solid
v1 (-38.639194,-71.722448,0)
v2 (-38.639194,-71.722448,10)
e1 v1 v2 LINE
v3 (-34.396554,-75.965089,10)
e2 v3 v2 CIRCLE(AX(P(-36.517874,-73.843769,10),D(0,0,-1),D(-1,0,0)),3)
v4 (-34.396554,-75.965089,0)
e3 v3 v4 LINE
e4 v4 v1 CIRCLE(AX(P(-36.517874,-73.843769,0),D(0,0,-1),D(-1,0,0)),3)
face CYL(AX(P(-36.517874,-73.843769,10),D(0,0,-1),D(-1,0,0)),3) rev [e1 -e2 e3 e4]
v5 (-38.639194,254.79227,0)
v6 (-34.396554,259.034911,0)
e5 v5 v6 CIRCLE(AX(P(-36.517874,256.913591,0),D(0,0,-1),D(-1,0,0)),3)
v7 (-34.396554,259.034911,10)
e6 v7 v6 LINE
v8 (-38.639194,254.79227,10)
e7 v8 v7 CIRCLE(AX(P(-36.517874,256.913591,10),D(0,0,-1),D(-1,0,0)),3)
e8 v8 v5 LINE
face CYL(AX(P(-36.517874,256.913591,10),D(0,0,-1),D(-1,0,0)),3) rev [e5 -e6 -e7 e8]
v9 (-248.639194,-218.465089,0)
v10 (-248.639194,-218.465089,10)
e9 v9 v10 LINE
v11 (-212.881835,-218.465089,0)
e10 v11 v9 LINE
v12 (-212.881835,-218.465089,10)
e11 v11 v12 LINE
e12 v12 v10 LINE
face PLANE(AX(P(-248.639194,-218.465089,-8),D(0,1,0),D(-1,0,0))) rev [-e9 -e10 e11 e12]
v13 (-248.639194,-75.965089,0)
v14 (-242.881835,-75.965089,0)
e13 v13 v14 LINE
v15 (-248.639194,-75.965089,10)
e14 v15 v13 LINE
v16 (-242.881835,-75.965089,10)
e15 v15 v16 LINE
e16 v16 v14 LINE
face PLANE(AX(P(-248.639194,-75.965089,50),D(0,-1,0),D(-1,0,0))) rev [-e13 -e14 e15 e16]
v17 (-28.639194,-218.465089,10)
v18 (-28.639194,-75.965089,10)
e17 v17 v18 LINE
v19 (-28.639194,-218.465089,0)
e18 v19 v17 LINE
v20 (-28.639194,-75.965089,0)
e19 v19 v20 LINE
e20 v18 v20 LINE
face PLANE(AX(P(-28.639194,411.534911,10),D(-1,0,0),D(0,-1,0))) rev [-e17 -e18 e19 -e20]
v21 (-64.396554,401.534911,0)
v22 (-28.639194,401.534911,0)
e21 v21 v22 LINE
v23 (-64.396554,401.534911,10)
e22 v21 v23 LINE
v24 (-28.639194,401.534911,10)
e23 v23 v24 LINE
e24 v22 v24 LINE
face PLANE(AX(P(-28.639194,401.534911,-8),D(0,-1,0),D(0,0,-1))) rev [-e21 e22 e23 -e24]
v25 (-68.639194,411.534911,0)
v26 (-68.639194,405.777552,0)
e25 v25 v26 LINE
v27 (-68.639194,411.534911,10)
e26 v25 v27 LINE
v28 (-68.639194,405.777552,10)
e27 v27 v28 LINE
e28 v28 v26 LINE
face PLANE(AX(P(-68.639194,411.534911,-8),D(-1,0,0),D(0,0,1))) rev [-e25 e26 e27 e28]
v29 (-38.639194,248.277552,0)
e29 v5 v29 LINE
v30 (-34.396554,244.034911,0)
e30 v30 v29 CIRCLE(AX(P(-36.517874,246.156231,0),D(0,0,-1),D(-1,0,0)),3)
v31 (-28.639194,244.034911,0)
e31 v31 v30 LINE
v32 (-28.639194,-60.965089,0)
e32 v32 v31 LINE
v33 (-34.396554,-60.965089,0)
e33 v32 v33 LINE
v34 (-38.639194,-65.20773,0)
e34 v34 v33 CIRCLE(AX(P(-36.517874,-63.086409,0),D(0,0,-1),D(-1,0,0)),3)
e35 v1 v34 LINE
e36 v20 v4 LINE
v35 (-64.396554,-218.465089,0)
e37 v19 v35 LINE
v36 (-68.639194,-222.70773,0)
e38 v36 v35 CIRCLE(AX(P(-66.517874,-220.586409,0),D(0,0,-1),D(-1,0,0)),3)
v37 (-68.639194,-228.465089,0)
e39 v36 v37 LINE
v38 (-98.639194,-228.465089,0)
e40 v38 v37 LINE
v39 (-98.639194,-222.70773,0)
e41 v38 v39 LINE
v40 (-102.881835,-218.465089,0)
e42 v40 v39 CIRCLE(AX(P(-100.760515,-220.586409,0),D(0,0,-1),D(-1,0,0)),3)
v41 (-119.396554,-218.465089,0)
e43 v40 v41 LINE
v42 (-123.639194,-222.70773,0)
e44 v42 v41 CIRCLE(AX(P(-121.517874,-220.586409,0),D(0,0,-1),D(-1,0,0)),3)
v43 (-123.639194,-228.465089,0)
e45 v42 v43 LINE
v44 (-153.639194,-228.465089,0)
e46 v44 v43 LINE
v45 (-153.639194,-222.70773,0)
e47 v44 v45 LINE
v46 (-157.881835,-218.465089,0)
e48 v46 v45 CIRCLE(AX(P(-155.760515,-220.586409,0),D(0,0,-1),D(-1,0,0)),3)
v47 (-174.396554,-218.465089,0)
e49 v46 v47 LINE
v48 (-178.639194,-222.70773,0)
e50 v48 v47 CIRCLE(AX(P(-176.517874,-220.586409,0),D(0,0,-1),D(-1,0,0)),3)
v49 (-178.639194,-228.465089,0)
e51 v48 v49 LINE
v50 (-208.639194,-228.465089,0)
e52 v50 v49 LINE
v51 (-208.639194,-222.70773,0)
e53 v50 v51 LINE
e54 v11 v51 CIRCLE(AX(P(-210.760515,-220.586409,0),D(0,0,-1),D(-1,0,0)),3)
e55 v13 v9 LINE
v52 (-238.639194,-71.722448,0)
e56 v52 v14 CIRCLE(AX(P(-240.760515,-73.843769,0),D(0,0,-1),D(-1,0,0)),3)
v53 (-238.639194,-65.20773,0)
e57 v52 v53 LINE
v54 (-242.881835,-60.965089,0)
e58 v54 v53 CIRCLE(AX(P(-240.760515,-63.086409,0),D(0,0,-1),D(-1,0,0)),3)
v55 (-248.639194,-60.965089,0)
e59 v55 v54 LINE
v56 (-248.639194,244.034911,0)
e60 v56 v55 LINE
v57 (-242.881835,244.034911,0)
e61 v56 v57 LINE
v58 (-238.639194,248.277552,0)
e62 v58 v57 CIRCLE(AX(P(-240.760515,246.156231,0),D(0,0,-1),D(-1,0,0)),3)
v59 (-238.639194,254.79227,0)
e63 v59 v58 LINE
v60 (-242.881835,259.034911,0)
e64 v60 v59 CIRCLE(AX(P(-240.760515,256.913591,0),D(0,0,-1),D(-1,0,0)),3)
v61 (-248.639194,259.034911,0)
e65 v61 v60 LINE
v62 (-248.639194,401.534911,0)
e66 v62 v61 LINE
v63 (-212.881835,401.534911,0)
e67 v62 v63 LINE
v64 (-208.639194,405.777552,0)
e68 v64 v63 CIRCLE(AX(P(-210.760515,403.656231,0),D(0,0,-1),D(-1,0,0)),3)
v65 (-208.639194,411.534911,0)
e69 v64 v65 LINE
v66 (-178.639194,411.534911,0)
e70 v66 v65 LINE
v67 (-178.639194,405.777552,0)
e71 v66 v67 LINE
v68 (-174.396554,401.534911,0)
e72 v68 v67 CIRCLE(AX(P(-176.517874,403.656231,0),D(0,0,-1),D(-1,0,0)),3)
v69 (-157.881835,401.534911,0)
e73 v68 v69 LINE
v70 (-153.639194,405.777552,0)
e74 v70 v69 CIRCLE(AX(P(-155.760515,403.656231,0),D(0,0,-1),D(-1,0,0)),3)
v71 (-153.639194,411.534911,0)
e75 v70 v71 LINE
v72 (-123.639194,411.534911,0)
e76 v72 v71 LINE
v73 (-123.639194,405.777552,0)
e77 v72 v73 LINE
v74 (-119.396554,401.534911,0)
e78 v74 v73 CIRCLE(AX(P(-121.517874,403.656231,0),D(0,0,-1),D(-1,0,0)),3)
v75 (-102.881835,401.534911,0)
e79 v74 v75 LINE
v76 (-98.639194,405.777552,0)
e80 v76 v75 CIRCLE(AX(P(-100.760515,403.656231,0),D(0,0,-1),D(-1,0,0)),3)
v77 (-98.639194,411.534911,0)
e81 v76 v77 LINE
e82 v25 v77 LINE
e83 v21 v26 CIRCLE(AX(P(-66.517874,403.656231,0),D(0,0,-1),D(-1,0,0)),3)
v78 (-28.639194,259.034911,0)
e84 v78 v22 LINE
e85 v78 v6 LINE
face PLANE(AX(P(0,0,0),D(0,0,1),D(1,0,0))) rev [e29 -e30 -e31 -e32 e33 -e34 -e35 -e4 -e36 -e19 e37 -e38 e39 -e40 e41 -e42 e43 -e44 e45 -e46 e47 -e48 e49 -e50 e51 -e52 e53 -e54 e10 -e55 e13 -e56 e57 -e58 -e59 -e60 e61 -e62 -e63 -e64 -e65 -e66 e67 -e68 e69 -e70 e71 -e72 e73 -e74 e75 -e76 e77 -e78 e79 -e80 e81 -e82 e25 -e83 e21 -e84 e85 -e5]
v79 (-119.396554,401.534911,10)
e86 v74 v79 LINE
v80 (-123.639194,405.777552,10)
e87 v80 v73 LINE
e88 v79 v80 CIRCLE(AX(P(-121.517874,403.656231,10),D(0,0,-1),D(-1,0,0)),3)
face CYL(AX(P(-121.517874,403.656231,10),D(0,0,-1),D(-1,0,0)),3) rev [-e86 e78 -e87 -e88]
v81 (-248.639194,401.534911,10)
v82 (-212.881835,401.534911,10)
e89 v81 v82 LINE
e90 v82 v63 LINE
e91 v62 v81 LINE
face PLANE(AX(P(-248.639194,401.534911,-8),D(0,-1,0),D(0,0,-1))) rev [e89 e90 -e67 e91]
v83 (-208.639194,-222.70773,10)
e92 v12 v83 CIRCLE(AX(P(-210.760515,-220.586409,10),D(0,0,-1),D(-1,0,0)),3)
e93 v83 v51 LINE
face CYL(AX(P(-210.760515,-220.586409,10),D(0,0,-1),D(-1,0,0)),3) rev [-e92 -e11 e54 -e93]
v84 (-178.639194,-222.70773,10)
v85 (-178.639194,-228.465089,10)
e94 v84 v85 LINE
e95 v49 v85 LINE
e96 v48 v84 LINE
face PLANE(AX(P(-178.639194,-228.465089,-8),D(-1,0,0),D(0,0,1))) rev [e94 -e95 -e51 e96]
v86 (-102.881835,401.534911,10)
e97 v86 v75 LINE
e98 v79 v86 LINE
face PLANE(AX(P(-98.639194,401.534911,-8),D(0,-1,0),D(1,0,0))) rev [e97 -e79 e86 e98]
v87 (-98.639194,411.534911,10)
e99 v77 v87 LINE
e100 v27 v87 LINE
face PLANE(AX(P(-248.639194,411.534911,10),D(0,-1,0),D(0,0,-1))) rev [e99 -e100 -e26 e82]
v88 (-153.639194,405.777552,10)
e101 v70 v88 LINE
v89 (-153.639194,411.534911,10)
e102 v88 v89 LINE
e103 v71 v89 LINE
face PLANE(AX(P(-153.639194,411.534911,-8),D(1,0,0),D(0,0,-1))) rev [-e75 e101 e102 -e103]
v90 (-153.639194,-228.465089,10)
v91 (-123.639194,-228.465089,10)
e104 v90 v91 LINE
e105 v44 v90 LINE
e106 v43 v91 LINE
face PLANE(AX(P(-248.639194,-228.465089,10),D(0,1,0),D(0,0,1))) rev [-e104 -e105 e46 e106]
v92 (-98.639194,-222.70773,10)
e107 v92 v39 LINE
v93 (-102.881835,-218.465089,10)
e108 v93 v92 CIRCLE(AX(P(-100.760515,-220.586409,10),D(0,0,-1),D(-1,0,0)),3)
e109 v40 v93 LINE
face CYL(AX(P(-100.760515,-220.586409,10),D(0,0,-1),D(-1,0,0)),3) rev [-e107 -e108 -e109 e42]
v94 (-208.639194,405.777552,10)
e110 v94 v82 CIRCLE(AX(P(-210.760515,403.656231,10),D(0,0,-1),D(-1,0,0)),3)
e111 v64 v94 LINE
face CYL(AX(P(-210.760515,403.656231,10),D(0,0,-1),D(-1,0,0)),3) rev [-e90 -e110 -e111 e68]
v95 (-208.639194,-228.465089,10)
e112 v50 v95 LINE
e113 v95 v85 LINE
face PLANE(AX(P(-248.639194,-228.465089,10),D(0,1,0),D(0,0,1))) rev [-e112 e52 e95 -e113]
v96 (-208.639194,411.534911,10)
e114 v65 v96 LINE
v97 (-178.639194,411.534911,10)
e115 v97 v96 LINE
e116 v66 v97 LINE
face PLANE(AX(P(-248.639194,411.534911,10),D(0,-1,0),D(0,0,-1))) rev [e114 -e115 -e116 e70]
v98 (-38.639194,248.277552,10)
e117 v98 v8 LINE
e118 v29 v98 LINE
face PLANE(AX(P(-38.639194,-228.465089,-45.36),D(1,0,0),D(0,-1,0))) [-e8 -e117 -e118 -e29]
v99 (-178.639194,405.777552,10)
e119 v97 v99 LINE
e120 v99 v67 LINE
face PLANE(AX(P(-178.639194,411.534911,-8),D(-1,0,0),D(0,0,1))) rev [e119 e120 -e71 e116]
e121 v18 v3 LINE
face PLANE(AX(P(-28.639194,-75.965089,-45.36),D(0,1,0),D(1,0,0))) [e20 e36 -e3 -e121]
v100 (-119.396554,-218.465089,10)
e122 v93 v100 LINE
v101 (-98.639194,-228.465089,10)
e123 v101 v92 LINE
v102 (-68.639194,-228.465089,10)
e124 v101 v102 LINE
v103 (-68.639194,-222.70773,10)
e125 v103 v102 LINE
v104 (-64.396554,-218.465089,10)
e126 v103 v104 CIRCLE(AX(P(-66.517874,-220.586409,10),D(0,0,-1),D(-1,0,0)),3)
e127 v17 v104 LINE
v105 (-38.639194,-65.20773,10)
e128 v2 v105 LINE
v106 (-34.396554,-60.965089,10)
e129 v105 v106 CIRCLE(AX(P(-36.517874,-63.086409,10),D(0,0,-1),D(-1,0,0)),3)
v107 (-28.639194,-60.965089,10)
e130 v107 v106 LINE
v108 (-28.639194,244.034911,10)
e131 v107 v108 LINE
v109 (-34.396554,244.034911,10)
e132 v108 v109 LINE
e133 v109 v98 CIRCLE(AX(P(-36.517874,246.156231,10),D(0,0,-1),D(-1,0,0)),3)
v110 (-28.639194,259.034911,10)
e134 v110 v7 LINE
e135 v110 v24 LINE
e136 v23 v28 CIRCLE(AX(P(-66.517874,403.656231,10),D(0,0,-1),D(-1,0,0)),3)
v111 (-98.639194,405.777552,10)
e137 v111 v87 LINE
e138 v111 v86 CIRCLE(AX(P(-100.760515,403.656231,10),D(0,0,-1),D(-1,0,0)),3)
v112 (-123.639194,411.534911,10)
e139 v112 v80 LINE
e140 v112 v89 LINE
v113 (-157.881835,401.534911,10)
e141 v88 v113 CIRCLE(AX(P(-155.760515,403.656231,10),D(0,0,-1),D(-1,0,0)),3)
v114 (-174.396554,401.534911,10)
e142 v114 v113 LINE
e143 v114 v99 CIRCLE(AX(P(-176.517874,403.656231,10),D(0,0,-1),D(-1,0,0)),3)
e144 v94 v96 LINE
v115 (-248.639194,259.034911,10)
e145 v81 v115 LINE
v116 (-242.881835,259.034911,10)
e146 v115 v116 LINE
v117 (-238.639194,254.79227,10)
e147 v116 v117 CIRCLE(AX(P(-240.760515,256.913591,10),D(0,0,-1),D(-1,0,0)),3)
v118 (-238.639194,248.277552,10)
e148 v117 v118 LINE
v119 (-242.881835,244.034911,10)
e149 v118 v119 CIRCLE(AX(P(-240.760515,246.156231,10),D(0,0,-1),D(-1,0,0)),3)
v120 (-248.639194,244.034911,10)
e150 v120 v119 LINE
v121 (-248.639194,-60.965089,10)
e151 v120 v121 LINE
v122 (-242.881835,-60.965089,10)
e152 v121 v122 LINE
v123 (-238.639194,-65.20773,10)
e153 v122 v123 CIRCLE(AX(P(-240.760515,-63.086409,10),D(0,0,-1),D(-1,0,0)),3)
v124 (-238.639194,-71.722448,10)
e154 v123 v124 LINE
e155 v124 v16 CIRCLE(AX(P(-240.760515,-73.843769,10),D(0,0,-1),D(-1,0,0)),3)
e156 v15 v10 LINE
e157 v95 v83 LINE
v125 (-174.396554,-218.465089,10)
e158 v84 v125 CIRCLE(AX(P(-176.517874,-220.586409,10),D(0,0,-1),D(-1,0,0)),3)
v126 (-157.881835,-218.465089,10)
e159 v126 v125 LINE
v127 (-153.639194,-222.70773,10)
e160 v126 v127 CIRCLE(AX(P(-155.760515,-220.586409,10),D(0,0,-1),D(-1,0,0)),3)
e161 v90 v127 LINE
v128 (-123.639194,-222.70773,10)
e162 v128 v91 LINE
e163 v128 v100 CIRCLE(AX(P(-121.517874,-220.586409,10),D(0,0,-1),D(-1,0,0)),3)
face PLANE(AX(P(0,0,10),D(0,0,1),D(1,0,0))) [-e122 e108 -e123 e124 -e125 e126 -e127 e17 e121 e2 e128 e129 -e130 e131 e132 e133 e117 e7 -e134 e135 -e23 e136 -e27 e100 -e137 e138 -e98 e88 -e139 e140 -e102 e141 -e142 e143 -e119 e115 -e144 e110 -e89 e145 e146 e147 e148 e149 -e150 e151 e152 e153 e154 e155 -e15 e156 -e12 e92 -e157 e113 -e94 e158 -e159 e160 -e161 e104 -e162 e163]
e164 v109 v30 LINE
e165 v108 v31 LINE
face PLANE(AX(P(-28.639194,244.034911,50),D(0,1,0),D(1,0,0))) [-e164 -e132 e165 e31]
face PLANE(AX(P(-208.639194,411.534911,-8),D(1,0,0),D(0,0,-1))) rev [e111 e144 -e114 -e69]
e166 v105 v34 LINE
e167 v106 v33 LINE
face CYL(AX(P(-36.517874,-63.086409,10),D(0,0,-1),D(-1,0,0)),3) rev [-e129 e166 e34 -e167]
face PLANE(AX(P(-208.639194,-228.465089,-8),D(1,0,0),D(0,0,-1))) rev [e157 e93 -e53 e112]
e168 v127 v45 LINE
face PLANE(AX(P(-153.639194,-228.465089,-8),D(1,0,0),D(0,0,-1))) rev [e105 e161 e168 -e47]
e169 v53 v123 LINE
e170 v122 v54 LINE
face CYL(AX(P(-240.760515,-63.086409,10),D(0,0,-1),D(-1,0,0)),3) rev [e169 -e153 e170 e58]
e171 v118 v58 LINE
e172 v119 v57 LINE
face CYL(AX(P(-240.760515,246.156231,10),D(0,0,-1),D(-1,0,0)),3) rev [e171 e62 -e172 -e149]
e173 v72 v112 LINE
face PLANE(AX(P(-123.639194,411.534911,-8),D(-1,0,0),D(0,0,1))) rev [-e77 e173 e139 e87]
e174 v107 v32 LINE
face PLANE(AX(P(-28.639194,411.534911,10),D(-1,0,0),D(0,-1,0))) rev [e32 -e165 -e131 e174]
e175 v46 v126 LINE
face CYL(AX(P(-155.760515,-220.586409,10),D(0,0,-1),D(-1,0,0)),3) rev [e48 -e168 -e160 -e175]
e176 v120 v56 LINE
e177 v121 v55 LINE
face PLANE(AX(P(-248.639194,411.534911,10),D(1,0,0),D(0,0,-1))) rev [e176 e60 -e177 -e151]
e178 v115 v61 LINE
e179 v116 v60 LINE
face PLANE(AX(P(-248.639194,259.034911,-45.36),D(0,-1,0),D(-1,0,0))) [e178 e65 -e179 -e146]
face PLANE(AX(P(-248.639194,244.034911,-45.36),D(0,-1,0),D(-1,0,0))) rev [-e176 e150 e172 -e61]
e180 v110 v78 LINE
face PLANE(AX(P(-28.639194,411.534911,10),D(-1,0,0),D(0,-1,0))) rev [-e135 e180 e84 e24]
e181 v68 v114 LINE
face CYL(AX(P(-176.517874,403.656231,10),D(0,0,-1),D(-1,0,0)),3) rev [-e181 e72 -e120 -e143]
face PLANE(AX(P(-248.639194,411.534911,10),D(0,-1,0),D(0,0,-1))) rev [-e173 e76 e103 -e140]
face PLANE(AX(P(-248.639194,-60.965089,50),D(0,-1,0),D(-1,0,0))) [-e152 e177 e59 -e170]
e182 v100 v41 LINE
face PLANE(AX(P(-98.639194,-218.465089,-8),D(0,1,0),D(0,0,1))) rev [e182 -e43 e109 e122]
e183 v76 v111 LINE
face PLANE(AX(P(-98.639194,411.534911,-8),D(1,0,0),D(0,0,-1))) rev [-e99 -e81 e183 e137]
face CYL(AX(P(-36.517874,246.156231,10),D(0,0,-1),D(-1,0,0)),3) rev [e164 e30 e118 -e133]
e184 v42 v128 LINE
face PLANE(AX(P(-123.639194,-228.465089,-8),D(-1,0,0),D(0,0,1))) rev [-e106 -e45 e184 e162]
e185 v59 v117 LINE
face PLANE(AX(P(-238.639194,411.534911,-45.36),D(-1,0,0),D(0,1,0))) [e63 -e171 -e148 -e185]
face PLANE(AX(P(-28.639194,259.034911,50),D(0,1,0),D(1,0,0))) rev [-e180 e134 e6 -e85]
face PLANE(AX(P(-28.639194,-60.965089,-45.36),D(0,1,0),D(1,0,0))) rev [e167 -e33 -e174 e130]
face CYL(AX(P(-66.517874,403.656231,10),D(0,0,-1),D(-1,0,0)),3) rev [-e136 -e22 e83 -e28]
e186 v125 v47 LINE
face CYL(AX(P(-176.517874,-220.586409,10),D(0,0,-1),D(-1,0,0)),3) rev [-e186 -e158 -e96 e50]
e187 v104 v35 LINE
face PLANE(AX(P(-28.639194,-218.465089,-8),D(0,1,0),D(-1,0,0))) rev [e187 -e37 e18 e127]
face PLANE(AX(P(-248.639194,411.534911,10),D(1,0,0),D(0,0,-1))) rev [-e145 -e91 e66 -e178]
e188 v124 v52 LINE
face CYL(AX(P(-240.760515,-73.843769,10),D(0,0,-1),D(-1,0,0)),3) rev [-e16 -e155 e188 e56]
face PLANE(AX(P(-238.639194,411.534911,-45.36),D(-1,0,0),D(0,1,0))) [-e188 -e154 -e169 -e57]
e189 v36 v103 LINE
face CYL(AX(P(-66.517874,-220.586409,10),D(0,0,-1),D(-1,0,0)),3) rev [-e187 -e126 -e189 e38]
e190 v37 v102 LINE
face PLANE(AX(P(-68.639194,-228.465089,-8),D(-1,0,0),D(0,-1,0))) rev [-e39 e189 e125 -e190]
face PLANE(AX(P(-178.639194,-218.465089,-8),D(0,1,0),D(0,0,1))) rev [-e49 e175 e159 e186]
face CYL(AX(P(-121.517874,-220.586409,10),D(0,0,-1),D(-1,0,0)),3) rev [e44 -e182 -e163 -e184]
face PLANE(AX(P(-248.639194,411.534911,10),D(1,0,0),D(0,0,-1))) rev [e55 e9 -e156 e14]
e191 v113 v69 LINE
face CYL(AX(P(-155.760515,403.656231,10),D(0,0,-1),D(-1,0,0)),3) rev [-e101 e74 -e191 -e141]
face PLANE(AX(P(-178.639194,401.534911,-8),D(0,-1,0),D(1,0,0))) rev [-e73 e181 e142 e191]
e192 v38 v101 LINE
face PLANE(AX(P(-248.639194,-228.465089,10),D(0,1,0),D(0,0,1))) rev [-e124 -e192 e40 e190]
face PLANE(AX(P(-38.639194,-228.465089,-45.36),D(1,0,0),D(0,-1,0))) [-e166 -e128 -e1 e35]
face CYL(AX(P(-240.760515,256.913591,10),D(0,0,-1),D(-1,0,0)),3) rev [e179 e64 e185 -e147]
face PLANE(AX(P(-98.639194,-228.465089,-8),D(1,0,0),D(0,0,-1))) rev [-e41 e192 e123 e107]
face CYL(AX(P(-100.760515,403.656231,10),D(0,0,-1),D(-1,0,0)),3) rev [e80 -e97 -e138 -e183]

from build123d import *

# Parameters (mm, degrees)
SKETCH3_W           = 220
SKETCH3_H           = 640
BOSS_EXTRUDE1_DEPTH = 10
SKETCH4_W           = 40
SKETCH4_H           = 10
SKETCH4_W_2         = 25
CUT_EXTRUDE1_DEPTH  = 18
CAVITY1_START       = -75.965089032
CAVITY1_OUTLINE_W   = 10
CAVITY1_OUTLINE_H   = 10
CAVITY1_DEPTH       = 15
CAVITY1_START_2     = 244.034910968
CAVITY1_2_OUTLINE_W = 10
CAVITY1_2_OUTLINE_H = 10
CAVITY1_2_DEPTH     = 15
SKETCH7_R           = 3
CUT_EXTRUDE4_DEPTH  = 10


# Read off the part's stored shape, not the designer's step: Cavity1
with BuildPart() as part:
    # Sketch3 → Boss-Extrude1 (new body)
    with BuildSketch(Plane.XY):
        with Locations((-138.639194455, 91.534910968)):
            Rectangle(SKETCH3_W, SKETCH3_H)
    extrude(amount=BOSS_EXTRUDE1_DEPTH)

    # Sketch4 → Cut-Extrude1 (cut)
    with BuildSketch(Plane.XY.offset(10)):
        with Locations((-228.639194455, 406.534910968)):
            Rectangle(SKETCH4_W, SKETCH4_H)
        with Locations((-166.139194455, 406.534910968)):
            Rectangle(SKETCH4_W_2, SKETCH4_H)
        with Locations((-111.139194455, 406.534910968)):
            Rectangle(SKETCH4_W_2, SKETCH4_H)
        with Locations((-48.639194455, 406.534910968)):
            Rectangle(SKETCH4_W, SKETCH4_H)
        with Locations((-48.639194455, -223.465089032)):
            Rectangle(SKETCH4_W, SKETCH4_H)
        with Locations((-111.139194455, -223.465089032)):
            Rectangle(SKETCH4_W_2, SKETCH4_H)
        with Locations((-166.139194455, -223.465089032)):
            Rectangle(SKETCH4_W_2, SKETCH4_H)
        with Locations((-228.639194455, -223.465089032)):
            Rectangle(SKETCH4_W, SKETCH4_H)
    extrude(amount=-CUT_EXTRUDE1_DEPTH, mode=Mode.SUBTRACT)

    # Cavity1 outline → Cavity1 (cut)
    with BuildSketch(Plane(origin=(0, 0, 0), x_dir=(1, 0, 0), z_dir=(0, 1, 0)).offset(CAVITY1_START)):
        with Locations((-33.639194455, -5)):
            Rectangle(CAVITY1_OUTLINE_W, CAVITY1_OUTLINE_H)
        with Locations((-243.639194455, -5)):
            Rectangle(CAVITY1_OUTLINE_W, CAVITY1_OUTLINE_H)
    extrude(amount=CAVITY1_DEPTH, mode=Mode.SUBTRACT)

    # Cavity1 2 outline → Cavity1 2 (cut)
    with BuildSketch(Plane(origin=(0, 0, 0), x_dir=(1, 0, 0), z_dir=(0, 1, 0)).offset(CAVITY1_START_2)):
        with Locations((-33.639194455, -5)):
            Rectangle(CAVITY1_2_OUTLINE_W, CAVITY1_2_OUTLINE_H)
        with Locations((-243.639194455, -5)):
            Rectangle(CAVITY1_2_OUTLINE_W, CAVITY1_2_OUTLINE_H)
    extrude(amount=CAVITY1_2_DEPTH, mode=Mode.SUBTRACT)

    # Sketch7 → Cut-Extrude4 (cut)
    with BuildSketch(Plane(origin=(0, 0, 0), x_dir=(-1, 0, 0), z_dir=(0, 0, -1))):
        with Locations((36.517874112, -63.086409375)):
            Circle(SKETCH7_R)
        with Locations((36.517874112, -73.843768688)):
            Circle(SKETCH7_R)
        with Locations((240.760514799, -63.086409375)):
            Circle(SKETCH7_R)
        with Locations((240.760514799, -73.843768688)):
            Circle(SKETCH7_R)
        with Locations((240.760514799, 256.913590625)):
            Circle(SKETCH7_R)
        with Locations((240.760514799, 246.156231312)):
            Circle(SKETCH7_R)
        with Locations((36.517874112, 256.913590625)):
            Circle(SKETCH7_R)
        with Locations((36.517874112, 246.156231312)):
            Circle(SKETCH7_R)
        with Locations((121.517874112, 403.656231312)):
            Circle(SKETCH7_R)
        with Locations((66.517874112, 403.656231312)):
            Circle(SKETCH7_R)
        with Locations((100.760514799, 403.656231312)):
            Circle(SKETCH7_R)
        with Locations((210.760514799, 403.656231312)):
            Circle(SKETCH7_R)
        with Locations((155.760514799, 403.656231312)):
            Circle(SKETCH7_R)
        with Locations((176.517874112, 403.656231312)):
            Circle(SKETCH7_R)
        with Locations((121.517874112, -220.586409375)):
            Circle(SKETCH7_R)
        with Locations((66.517874112, -220.586409375)):
            Circle(SKETCH7_R)
        with Locations((100.760514799, -220.586409375)):
            Circle(SKETCH7_R)
        with Locations((155.760514799, -220.586409375)):
            Circle(SKETCH7_R)
        with Locations((176.517874112, -220.586409375)):
            Circle(SKETCH7_R)
        with Locations((210.760514799, -220.586409375)):
            Circle(SKETCH7_R)
    extrude(amount=-CUT_EXTRUDE4_DEPTH, mode=Mode.SUBTRACT)


solid = part.part
